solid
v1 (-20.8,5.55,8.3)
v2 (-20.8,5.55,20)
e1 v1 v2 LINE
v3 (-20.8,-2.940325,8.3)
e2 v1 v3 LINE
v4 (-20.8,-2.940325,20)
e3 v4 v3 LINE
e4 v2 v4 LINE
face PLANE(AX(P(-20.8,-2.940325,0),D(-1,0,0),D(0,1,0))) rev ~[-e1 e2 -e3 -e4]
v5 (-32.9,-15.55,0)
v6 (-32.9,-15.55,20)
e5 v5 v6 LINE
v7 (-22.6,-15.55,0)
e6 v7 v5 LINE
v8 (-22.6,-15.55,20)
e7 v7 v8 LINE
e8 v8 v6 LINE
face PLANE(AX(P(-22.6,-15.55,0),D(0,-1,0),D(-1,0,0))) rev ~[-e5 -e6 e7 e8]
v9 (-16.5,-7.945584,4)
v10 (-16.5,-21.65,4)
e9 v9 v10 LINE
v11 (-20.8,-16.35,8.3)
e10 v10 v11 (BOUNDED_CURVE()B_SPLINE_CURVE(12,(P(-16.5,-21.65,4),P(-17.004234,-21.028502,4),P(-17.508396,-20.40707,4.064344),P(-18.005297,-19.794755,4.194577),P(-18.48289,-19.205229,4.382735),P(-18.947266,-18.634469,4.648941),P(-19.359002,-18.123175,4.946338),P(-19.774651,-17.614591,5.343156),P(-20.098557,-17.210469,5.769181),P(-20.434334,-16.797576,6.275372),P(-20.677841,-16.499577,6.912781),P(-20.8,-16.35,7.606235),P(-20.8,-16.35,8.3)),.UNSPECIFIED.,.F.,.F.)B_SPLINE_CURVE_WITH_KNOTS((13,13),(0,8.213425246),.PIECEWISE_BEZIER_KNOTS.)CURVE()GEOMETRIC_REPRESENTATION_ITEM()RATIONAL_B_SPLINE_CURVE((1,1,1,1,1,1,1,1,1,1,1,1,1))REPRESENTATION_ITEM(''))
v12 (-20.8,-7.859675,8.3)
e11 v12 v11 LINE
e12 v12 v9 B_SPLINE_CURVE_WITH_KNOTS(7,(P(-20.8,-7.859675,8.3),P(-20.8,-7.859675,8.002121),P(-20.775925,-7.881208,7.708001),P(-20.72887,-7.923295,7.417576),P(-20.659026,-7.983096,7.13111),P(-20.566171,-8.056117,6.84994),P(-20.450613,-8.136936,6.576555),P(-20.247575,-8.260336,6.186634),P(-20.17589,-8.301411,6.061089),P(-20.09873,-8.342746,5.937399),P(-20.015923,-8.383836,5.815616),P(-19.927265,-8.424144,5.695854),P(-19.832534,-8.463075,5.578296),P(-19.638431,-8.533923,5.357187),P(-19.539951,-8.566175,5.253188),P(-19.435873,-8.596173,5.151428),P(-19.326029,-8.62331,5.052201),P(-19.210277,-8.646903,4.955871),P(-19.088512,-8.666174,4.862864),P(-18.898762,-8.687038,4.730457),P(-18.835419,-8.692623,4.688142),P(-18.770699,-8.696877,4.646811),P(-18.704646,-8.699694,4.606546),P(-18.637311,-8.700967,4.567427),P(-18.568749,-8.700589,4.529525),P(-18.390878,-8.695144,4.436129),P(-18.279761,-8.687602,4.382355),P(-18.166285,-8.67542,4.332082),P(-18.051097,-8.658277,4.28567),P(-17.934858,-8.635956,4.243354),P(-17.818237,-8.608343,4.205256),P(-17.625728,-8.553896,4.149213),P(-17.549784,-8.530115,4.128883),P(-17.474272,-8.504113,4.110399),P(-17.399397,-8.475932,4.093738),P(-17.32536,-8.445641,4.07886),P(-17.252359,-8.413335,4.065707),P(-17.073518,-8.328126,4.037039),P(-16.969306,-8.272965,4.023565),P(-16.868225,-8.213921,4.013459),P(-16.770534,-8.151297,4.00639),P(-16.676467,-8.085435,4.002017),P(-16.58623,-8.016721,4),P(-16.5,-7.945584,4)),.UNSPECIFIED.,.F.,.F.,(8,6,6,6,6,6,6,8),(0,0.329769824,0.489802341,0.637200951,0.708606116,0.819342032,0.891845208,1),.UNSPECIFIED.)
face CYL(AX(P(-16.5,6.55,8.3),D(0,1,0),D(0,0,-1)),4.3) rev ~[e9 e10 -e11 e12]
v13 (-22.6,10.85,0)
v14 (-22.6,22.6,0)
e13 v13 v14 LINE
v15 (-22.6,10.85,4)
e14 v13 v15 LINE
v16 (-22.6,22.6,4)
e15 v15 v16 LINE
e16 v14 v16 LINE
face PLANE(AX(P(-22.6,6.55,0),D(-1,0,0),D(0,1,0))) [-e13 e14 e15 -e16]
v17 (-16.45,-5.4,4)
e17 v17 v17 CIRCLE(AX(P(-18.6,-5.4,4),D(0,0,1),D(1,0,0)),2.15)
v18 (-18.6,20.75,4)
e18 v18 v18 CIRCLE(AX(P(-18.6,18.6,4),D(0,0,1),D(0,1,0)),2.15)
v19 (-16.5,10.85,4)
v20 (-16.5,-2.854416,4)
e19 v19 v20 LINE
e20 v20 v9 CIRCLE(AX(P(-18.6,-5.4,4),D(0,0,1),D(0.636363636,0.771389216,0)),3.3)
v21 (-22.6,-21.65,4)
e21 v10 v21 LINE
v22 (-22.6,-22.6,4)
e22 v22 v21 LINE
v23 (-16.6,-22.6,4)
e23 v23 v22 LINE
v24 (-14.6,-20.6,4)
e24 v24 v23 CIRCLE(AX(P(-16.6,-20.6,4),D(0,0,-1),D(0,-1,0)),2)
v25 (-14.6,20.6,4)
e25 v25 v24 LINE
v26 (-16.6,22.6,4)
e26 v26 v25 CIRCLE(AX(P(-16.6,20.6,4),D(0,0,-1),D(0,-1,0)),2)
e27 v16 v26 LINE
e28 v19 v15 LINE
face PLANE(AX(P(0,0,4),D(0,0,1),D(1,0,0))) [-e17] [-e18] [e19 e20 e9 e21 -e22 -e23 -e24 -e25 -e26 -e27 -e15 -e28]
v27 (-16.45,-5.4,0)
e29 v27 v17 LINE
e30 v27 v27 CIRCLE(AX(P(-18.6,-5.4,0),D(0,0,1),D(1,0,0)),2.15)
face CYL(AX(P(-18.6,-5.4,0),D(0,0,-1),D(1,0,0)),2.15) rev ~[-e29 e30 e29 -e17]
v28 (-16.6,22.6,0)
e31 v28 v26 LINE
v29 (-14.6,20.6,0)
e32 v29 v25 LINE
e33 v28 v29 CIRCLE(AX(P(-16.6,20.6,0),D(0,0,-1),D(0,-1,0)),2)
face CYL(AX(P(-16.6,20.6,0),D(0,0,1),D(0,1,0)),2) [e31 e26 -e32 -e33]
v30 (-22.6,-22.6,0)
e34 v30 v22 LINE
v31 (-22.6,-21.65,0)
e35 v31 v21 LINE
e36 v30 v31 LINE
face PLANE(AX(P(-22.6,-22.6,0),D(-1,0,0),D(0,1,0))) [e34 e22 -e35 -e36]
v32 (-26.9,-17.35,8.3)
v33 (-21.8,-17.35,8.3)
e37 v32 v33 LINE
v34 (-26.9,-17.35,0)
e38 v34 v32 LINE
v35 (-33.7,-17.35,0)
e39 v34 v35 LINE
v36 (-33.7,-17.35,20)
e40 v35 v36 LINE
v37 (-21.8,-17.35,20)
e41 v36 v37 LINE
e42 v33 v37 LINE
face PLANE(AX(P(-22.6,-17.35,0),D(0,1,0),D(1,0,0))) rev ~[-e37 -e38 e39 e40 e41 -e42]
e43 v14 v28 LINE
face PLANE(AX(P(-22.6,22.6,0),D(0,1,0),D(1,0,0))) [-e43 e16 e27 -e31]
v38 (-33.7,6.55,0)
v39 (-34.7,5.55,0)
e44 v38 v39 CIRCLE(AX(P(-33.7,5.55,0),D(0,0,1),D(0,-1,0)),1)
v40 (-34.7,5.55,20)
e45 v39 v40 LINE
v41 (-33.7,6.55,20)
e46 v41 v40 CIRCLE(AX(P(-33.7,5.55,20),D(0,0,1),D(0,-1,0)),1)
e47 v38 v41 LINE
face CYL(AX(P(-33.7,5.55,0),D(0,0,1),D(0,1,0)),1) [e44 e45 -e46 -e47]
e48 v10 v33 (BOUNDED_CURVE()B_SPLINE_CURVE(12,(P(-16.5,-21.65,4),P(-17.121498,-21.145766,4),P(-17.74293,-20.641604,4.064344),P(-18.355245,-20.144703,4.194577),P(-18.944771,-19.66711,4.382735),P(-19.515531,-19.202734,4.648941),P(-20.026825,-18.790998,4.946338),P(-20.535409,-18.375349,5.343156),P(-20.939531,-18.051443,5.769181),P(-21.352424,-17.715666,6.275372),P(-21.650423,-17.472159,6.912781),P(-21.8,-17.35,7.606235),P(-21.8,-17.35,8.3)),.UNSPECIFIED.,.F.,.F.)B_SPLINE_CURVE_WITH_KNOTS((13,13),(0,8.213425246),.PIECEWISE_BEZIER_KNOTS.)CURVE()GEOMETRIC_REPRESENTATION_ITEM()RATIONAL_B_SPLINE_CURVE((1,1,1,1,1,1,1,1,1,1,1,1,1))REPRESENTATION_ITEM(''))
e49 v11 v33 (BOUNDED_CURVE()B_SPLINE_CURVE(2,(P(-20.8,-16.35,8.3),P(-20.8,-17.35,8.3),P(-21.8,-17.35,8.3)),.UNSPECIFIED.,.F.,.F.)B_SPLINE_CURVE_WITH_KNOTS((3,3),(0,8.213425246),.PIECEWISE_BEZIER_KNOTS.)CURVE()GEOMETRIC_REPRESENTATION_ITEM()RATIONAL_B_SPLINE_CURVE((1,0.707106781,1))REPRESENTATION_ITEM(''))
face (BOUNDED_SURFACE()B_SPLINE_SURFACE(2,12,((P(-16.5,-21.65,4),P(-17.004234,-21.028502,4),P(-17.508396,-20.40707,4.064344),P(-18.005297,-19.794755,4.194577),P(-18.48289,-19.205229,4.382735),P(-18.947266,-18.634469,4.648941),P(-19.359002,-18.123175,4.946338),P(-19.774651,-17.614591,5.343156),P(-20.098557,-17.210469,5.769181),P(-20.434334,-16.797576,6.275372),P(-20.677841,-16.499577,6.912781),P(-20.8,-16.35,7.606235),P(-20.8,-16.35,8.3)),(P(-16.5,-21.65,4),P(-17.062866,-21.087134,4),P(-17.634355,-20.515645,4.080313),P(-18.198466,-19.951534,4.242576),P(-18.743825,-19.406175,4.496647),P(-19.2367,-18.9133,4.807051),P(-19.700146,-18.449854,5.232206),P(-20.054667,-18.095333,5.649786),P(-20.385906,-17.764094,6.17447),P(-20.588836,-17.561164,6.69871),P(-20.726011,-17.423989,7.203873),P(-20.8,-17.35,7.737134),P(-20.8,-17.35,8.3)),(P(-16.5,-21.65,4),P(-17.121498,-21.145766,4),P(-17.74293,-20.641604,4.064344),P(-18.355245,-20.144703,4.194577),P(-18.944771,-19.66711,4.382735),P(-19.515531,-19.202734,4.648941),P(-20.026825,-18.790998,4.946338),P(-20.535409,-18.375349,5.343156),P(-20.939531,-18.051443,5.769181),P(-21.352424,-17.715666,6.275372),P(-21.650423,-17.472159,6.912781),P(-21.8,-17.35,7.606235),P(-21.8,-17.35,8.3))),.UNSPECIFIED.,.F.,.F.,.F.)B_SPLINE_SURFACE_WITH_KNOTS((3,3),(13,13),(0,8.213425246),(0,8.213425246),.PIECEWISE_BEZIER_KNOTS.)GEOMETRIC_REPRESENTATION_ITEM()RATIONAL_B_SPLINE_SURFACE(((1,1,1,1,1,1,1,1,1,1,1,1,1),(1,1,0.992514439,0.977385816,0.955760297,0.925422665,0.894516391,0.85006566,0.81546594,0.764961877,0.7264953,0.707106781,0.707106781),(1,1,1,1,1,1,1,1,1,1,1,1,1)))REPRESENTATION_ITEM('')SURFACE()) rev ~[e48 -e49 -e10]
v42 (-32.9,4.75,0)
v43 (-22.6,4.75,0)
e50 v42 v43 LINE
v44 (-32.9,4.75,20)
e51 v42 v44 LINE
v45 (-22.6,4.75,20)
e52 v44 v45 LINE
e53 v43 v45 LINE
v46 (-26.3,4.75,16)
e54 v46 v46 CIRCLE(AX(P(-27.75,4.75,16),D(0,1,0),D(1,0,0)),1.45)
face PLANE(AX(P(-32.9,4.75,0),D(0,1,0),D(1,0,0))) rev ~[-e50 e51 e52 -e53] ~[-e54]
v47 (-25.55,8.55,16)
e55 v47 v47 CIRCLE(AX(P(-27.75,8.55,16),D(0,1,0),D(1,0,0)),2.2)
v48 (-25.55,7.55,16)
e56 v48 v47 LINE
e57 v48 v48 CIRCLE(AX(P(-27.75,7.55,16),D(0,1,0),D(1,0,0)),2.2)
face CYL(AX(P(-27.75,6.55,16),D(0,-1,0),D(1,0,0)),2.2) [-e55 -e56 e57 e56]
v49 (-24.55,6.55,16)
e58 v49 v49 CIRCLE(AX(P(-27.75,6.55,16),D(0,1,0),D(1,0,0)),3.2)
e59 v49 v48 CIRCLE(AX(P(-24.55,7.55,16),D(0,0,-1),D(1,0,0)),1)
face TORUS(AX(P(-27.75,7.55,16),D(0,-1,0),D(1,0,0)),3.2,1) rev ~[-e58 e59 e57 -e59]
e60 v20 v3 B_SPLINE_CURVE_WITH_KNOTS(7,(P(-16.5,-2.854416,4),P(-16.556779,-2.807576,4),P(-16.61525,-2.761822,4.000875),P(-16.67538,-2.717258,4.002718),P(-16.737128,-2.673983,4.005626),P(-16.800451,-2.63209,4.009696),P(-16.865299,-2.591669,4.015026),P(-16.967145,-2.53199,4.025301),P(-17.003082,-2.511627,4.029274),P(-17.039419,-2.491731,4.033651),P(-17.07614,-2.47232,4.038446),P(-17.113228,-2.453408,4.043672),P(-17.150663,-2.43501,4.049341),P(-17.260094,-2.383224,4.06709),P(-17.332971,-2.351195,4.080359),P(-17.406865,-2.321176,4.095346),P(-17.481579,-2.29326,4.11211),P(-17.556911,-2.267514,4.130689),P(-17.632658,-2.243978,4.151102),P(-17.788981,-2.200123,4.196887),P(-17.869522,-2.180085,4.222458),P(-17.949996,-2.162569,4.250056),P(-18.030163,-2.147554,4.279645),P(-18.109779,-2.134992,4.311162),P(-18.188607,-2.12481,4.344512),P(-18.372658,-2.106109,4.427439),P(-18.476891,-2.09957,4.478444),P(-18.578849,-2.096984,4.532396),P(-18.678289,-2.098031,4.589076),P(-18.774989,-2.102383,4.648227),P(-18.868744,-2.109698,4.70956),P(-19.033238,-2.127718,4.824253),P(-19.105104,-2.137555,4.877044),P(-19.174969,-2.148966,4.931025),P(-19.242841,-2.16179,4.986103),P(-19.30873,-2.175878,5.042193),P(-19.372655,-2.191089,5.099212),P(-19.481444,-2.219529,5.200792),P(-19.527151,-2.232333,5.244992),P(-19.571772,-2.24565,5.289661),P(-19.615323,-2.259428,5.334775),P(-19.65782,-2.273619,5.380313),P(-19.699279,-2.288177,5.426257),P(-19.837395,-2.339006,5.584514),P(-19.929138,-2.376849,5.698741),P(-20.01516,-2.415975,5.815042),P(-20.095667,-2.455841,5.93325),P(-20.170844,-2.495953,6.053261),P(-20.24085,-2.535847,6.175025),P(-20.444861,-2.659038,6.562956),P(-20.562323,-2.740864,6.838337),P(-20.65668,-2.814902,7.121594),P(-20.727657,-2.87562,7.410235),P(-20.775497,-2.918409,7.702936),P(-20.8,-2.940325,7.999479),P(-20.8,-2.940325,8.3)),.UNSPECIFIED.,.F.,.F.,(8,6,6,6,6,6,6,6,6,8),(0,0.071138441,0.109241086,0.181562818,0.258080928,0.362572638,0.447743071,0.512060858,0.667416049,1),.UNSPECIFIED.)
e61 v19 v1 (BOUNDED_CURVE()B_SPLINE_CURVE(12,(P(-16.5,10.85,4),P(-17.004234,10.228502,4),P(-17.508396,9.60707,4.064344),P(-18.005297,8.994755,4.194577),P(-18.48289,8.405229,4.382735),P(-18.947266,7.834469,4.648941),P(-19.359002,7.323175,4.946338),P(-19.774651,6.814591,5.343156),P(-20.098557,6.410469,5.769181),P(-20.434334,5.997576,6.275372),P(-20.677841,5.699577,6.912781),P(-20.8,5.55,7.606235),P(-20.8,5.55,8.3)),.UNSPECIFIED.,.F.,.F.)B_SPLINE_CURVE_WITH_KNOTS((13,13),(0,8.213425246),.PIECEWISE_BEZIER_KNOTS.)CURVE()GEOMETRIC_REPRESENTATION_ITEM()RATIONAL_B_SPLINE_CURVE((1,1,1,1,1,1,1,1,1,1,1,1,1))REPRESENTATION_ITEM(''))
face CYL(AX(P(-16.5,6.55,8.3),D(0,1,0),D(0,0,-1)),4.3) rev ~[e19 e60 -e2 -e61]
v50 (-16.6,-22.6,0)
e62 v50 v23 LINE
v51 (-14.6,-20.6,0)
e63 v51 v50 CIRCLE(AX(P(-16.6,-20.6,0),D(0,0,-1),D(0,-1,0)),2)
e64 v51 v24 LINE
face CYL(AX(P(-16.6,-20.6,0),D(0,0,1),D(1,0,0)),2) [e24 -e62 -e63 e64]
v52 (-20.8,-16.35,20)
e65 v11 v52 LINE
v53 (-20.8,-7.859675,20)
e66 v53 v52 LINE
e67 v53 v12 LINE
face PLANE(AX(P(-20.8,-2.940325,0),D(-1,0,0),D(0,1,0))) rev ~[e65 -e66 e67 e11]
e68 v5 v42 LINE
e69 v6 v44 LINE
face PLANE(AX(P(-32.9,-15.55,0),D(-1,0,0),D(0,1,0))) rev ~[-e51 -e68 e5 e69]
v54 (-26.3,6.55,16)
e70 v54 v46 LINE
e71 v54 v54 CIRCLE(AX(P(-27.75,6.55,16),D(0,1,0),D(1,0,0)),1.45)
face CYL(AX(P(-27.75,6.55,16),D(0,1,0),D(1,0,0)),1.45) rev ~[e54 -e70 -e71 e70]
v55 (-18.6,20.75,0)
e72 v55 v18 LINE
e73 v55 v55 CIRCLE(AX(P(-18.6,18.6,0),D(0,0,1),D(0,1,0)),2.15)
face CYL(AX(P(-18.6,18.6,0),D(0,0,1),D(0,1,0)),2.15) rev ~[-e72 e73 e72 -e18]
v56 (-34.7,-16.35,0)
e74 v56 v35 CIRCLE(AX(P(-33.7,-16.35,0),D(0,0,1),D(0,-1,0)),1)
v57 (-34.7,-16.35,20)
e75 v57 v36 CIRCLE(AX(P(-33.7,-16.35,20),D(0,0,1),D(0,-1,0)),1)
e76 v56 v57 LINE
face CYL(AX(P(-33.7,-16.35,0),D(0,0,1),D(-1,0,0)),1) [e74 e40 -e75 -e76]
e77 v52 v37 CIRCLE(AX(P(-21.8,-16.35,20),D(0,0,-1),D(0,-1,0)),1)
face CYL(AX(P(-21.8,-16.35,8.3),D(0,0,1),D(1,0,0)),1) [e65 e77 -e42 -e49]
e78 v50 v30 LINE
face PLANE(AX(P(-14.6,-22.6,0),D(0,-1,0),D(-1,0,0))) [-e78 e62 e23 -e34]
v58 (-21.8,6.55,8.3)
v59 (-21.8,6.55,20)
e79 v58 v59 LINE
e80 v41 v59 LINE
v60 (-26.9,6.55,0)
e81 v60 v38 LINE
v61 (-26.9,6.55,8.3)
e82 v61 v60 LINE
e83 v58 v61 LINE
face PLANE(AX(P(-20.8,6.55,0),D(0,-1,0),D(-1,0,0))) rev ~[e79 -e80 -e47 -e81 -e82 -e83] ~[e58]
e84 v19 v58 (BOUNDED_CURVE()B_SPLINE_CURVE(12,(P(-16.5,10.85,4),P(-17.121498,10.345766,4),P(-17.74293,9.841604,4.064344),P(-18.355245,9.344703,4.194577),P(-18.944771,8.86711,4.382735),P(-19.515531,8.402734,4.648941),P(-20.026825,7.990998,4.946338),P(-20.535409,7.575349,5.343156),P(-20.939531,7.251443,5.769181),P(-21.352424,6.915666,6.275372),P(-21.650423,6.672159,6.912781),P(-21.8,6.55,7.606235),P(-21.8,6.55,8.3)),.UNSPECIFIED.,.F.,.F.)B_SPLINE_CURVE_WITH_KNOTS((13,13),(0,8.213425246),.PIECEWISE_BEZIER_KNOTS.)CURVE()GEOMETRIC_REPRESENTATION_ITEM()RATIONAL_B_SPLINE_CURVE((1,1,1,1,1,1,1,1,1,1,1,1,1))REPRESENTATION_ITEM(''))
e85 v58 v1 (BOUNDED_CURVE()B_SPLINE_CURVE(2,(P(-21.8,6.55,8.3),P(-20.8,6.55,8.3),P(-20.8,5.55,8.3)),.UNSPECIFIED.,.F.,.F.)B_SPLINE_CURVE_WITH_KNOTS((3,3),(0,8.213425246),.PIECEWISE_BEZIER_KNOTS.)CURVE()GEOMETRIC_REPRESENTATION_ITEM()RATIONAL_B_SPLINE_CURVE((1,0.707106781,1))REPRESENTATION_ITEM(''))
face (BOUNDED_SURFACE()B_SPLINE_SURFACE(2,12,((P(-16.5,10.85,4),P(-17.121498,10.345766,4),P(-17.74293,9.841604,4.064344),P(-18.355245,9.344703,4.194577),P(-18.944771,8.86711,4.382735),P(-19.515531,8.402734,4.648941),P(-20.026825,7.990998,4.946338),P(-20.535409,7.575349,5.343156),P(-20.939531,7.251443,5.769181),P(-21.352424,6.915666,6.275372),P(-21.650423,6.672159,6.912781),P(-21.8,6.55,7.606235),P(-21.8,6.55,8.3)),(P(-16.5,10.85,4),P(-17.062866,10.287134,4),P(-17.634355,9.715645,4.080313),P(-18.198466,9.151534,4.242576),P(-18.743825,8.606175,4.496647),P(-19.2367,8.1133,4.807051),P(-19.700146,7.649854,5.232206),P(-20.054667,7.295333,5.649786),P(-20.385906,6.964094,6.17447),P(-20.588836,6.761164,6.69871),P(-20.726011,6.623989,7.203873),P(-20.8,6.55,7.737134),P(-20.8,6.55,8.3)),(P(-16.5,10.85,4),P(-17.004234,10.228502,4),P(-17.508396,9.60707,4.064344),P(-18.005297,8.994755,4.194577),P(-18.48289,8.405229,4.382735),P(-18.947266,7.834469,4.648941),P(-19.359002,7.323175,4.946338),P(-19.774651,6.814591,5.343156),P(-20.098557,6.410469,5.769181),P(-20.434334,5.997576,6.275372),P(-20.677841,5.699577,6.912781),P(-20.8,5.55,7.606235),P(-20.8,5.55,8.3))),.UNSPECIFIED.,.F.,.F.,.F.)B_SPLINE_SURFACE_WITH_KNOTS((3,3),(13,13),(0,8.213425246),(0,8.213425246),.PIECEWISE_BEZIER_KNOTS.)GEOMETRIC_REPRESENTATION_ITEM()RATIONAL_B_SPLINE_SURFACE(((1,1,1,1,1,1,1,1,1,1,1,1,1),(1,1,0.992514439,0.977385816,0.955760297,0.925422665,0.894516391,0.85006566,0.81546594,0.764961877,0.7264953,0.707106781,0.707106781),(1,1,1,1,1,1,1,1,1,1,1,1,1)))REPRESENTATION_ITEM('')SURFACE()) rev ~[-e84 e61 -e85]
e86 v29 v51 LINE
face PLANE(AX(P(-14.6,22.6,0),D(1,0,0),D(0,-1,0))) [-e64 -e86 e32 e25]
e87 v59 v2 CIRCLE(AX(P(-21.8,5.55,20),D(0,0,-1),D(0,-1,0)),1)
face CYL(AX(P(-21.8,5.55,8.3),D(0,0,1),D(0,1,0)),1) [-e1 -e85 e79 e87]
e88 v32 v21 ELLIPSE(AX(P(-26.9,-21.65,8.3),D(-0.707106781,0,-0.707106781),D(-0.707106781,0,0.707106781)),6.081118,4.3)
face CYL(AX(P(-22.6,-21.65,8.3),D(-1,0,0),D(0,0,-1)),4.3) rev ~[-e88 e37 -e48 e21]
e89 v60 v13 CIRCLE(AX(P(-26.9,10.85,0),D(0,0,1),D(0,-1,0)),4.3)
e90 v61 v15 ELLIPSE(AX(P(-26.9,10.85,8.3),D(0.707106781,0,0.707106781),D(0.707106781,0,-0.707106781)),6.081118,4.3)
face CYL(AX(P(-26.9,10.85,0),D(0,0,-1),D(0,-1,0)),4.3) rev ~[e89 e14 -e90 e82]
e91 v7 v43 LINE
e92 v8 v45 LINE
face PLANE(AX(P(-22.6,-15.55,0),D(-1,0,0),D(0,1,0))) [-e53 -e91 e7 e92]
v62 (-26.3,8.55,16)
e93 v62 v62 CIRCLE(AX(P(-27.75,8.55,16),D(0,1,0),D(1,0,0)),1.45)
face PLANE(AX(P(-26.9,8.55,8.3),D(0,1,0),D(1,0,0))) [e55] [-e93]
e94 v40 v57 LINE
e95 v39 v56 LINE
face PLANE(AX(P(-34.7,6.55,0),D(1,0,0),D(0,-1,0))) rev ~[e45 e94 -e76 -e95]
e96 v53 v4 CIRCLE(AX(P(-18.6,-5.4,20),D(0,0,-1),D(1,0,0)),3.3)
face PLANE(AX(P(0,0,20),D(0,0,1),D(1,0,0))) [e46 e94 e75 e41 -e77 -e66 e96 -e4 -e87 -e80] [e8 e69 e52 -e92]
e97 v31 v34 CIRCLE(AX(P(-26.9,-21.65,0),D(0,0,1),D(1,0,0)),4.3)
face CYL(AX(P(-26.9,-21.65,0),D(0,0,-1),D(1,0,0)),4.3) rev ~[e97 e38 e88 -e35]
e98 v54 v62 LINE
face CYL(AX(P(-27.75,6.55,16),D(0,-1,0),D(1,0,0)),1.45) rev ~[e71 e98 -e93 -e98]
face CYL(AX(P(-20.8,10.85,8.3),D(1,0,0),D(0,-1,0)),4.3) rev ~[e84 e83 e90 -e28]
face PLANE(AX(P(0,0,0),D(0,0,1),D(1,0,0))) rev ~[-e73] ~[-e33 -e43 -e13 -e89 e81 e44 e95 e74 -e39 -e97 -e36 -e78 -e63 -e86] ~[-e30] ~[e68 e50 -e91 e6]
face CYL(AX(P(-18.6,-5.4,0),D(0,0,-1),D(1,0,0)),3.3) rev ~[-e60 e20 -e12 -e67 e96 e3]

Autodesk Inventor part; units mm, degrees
ref_plane "YZ Plane" through (0, 0, 0) normal (1, 0, 0) x (0, 1, 0)
ref_plane "XZ Plane" through (0, 0, 0) normal (0, 1, 0) x (-1, 0, 0)
ref_plane "XY Plane" through (0, 0, 0) normal (0, 0, 1) x (1, 0, 0)
sketch "Sketch1" plane through (0, 0, 0) normal (0, 0, 1) x (1, 0, 0)
  line L0 (-22.6, 22.6) -> (-14.6, 22.6)
  line L1 (-14.6, 22.6) -> (-14.6, -22.6)
  line L2 (-14.6, -22.6) -> (-22.6, -22.6)
  line L3 (-22.6, -22.6) -> (-22.6, 22.6)
  line L4 (5.4, -5.4) -> (-38.7938, -5.4) construction
  line L5 (-22.6, -5.4) -> (-27.75, -5.4) construction
  line L6 (-32.9, 4.75) -> (-22.6, 4.75)
  line L7 (-22.6, 4.75) -> (-22.6, -15.55)
  line L8 (-22.6, -15.55) -> (-32.9, -15.55)
  line L9 (-32.9, -15.55) -> (-32.9, 4.75)
  line L10 (-32.9, 4.75) -> (-22.6, -15.55) construction
  line L11 (-22.6, 4.75) -> (-32.9, -15.55) construction
  line L12 (-20.8, 6.55) -> (-34.7, 6.55)
  line L13 (-34.7, 6.55) -> (-34.7, -17.35)
  line L14 (-34.7, -17.35) -> (-20.8, -17.35)
  line L15 (-20.8, -17.35) -> (-20.8, 6.55)
  line L16 (-22.6, 22.6) -> (-22.6, 18.6) construction
  line L17 (-22.6, 18.6) -> (-18.6, 18.6) construction
  line L18 (-18.6, 18.6) -> (-18.6, -5.4) construction
  circle A0 centre (-18.6, -5.4) radius 3.3
  circle A1 centre (-18.6, -5.4) radius 2.15
  point P0 (-22.6, 6.55)
  point P1 (-22.6, -17.35)
  point P2 (-20.8, -2.9403)
  point P3 (-20.8, -7.8597)
  dimension "d0" = 8
  dimension "d1" = 45.2
  dimension "d2" = 5.15
  dimension "d3" = 10.3
  dimension "d4" = 20.3
  dimension "d5" = 1.8
  dimension "d10" = 4
  dimension "d11" = 4
  dimension "d12" = 24
  dimension "d32" = 6.6
  dimension "d35" = 4.3
extrude "Extrusion1" add sketch "Sketch1" along normal blind 20 contours L12 L15 A0 L14 L3 | L3 L6 L9 L8 L14 L13 L12 | L15 A0 picked at (-20.9741, -4.7782)
extrude "Extrusion2" add sketch "Sketch1" along normal blind 4 contours L0 L1 L2 L3 L14 L15 A0 L12 | A0 L15 | A1 picked at (-15.7123, -5.1492)
hole "Hole1" at (-18.6, 18.6, 0) at (-18.6, -5.4, 0) direction (0, 0, 1) diameter 4.3 depth 5 tip angle 118
fillet "Fillet1" radius 4.3 5 edges at (-20.8, -5.4, 4) (-21.7, 6.55, 4) (-21.7, -17.35, 4) (-22.6, 6.55, 2) (-22.6, -17.35, 2)
fillet "Fillet3" radius 1 8 edges at (-34.7, 6.55, 10) (-34.7, -17.35, 10) (-23.85, 6.55, 8.3) (-19.55, 10.85, 4) (-20.8, 6.55, 14.15) (-23.85, -17.35, 8.3) (-19.55, -21.65, 4) (-20.8, -17.35, 14.15)
sketch "Sketch2" plane through (-26.9, 6.55, 8.3) normal (0, 1, 0) x (1, 0, 0)
  line L0 (6.1, -11.7) -> (6.1, 0) construction
  line L1 (-7.8, 8.3) -> (-7.8, -11.7) construction
  line L2 (6.1, -11.7) -> (-7.8, -11.7) construction
  line L3 (-7.8, -11.7) -> (-7.8, -3.7) construction
  line L4 (-7.8, -3.7) -> (6.1, -3.7) construction
  line L5 (6.1, -3.7) -> (6.1, -11.7) construction
  line L6 (-7.8, -11.7) -> (6.1, -3.7) construction
  circle A0 centre (-0.85, -7.7) radius 1.45
  circle A1 centre (-0.85, -7.7) radius 2.2
  point P0 (26.9, 8.3)
  dimension "d23" = 8
  dimension "d24" = 2.9
  dimension "d25" = 0.75
extrude "Extrusion3" add sketch "Sketch2" along normal blind 2
fillet "Fillet4" radius 2 2 edges at (-14.6, 22.6, 2) (-14.6, -22.6, 2)
fillet "Fillet5" radius 1 1 edges at (-29.95, 6.55, 16)
extrude "Extrusion4" cut sketch "Sketch2" against normal blind 2 contours A0
extrude "Extrusion5" cut sketch "Sketch1" along normal blind 20 contours A0 L15 | L15 A0 | A1
extrude "Extrusion6" add sketch "Sketch1" along normal blind 4 contours A0 L15 picked at (-15.7123, -5.1492)
extrude "Extrusion7" add sketch "Sketch1" along normal blind 4 contours L15 A0 picked at (-20.9741, -4.7782)
properties material "ABS Plastic"
